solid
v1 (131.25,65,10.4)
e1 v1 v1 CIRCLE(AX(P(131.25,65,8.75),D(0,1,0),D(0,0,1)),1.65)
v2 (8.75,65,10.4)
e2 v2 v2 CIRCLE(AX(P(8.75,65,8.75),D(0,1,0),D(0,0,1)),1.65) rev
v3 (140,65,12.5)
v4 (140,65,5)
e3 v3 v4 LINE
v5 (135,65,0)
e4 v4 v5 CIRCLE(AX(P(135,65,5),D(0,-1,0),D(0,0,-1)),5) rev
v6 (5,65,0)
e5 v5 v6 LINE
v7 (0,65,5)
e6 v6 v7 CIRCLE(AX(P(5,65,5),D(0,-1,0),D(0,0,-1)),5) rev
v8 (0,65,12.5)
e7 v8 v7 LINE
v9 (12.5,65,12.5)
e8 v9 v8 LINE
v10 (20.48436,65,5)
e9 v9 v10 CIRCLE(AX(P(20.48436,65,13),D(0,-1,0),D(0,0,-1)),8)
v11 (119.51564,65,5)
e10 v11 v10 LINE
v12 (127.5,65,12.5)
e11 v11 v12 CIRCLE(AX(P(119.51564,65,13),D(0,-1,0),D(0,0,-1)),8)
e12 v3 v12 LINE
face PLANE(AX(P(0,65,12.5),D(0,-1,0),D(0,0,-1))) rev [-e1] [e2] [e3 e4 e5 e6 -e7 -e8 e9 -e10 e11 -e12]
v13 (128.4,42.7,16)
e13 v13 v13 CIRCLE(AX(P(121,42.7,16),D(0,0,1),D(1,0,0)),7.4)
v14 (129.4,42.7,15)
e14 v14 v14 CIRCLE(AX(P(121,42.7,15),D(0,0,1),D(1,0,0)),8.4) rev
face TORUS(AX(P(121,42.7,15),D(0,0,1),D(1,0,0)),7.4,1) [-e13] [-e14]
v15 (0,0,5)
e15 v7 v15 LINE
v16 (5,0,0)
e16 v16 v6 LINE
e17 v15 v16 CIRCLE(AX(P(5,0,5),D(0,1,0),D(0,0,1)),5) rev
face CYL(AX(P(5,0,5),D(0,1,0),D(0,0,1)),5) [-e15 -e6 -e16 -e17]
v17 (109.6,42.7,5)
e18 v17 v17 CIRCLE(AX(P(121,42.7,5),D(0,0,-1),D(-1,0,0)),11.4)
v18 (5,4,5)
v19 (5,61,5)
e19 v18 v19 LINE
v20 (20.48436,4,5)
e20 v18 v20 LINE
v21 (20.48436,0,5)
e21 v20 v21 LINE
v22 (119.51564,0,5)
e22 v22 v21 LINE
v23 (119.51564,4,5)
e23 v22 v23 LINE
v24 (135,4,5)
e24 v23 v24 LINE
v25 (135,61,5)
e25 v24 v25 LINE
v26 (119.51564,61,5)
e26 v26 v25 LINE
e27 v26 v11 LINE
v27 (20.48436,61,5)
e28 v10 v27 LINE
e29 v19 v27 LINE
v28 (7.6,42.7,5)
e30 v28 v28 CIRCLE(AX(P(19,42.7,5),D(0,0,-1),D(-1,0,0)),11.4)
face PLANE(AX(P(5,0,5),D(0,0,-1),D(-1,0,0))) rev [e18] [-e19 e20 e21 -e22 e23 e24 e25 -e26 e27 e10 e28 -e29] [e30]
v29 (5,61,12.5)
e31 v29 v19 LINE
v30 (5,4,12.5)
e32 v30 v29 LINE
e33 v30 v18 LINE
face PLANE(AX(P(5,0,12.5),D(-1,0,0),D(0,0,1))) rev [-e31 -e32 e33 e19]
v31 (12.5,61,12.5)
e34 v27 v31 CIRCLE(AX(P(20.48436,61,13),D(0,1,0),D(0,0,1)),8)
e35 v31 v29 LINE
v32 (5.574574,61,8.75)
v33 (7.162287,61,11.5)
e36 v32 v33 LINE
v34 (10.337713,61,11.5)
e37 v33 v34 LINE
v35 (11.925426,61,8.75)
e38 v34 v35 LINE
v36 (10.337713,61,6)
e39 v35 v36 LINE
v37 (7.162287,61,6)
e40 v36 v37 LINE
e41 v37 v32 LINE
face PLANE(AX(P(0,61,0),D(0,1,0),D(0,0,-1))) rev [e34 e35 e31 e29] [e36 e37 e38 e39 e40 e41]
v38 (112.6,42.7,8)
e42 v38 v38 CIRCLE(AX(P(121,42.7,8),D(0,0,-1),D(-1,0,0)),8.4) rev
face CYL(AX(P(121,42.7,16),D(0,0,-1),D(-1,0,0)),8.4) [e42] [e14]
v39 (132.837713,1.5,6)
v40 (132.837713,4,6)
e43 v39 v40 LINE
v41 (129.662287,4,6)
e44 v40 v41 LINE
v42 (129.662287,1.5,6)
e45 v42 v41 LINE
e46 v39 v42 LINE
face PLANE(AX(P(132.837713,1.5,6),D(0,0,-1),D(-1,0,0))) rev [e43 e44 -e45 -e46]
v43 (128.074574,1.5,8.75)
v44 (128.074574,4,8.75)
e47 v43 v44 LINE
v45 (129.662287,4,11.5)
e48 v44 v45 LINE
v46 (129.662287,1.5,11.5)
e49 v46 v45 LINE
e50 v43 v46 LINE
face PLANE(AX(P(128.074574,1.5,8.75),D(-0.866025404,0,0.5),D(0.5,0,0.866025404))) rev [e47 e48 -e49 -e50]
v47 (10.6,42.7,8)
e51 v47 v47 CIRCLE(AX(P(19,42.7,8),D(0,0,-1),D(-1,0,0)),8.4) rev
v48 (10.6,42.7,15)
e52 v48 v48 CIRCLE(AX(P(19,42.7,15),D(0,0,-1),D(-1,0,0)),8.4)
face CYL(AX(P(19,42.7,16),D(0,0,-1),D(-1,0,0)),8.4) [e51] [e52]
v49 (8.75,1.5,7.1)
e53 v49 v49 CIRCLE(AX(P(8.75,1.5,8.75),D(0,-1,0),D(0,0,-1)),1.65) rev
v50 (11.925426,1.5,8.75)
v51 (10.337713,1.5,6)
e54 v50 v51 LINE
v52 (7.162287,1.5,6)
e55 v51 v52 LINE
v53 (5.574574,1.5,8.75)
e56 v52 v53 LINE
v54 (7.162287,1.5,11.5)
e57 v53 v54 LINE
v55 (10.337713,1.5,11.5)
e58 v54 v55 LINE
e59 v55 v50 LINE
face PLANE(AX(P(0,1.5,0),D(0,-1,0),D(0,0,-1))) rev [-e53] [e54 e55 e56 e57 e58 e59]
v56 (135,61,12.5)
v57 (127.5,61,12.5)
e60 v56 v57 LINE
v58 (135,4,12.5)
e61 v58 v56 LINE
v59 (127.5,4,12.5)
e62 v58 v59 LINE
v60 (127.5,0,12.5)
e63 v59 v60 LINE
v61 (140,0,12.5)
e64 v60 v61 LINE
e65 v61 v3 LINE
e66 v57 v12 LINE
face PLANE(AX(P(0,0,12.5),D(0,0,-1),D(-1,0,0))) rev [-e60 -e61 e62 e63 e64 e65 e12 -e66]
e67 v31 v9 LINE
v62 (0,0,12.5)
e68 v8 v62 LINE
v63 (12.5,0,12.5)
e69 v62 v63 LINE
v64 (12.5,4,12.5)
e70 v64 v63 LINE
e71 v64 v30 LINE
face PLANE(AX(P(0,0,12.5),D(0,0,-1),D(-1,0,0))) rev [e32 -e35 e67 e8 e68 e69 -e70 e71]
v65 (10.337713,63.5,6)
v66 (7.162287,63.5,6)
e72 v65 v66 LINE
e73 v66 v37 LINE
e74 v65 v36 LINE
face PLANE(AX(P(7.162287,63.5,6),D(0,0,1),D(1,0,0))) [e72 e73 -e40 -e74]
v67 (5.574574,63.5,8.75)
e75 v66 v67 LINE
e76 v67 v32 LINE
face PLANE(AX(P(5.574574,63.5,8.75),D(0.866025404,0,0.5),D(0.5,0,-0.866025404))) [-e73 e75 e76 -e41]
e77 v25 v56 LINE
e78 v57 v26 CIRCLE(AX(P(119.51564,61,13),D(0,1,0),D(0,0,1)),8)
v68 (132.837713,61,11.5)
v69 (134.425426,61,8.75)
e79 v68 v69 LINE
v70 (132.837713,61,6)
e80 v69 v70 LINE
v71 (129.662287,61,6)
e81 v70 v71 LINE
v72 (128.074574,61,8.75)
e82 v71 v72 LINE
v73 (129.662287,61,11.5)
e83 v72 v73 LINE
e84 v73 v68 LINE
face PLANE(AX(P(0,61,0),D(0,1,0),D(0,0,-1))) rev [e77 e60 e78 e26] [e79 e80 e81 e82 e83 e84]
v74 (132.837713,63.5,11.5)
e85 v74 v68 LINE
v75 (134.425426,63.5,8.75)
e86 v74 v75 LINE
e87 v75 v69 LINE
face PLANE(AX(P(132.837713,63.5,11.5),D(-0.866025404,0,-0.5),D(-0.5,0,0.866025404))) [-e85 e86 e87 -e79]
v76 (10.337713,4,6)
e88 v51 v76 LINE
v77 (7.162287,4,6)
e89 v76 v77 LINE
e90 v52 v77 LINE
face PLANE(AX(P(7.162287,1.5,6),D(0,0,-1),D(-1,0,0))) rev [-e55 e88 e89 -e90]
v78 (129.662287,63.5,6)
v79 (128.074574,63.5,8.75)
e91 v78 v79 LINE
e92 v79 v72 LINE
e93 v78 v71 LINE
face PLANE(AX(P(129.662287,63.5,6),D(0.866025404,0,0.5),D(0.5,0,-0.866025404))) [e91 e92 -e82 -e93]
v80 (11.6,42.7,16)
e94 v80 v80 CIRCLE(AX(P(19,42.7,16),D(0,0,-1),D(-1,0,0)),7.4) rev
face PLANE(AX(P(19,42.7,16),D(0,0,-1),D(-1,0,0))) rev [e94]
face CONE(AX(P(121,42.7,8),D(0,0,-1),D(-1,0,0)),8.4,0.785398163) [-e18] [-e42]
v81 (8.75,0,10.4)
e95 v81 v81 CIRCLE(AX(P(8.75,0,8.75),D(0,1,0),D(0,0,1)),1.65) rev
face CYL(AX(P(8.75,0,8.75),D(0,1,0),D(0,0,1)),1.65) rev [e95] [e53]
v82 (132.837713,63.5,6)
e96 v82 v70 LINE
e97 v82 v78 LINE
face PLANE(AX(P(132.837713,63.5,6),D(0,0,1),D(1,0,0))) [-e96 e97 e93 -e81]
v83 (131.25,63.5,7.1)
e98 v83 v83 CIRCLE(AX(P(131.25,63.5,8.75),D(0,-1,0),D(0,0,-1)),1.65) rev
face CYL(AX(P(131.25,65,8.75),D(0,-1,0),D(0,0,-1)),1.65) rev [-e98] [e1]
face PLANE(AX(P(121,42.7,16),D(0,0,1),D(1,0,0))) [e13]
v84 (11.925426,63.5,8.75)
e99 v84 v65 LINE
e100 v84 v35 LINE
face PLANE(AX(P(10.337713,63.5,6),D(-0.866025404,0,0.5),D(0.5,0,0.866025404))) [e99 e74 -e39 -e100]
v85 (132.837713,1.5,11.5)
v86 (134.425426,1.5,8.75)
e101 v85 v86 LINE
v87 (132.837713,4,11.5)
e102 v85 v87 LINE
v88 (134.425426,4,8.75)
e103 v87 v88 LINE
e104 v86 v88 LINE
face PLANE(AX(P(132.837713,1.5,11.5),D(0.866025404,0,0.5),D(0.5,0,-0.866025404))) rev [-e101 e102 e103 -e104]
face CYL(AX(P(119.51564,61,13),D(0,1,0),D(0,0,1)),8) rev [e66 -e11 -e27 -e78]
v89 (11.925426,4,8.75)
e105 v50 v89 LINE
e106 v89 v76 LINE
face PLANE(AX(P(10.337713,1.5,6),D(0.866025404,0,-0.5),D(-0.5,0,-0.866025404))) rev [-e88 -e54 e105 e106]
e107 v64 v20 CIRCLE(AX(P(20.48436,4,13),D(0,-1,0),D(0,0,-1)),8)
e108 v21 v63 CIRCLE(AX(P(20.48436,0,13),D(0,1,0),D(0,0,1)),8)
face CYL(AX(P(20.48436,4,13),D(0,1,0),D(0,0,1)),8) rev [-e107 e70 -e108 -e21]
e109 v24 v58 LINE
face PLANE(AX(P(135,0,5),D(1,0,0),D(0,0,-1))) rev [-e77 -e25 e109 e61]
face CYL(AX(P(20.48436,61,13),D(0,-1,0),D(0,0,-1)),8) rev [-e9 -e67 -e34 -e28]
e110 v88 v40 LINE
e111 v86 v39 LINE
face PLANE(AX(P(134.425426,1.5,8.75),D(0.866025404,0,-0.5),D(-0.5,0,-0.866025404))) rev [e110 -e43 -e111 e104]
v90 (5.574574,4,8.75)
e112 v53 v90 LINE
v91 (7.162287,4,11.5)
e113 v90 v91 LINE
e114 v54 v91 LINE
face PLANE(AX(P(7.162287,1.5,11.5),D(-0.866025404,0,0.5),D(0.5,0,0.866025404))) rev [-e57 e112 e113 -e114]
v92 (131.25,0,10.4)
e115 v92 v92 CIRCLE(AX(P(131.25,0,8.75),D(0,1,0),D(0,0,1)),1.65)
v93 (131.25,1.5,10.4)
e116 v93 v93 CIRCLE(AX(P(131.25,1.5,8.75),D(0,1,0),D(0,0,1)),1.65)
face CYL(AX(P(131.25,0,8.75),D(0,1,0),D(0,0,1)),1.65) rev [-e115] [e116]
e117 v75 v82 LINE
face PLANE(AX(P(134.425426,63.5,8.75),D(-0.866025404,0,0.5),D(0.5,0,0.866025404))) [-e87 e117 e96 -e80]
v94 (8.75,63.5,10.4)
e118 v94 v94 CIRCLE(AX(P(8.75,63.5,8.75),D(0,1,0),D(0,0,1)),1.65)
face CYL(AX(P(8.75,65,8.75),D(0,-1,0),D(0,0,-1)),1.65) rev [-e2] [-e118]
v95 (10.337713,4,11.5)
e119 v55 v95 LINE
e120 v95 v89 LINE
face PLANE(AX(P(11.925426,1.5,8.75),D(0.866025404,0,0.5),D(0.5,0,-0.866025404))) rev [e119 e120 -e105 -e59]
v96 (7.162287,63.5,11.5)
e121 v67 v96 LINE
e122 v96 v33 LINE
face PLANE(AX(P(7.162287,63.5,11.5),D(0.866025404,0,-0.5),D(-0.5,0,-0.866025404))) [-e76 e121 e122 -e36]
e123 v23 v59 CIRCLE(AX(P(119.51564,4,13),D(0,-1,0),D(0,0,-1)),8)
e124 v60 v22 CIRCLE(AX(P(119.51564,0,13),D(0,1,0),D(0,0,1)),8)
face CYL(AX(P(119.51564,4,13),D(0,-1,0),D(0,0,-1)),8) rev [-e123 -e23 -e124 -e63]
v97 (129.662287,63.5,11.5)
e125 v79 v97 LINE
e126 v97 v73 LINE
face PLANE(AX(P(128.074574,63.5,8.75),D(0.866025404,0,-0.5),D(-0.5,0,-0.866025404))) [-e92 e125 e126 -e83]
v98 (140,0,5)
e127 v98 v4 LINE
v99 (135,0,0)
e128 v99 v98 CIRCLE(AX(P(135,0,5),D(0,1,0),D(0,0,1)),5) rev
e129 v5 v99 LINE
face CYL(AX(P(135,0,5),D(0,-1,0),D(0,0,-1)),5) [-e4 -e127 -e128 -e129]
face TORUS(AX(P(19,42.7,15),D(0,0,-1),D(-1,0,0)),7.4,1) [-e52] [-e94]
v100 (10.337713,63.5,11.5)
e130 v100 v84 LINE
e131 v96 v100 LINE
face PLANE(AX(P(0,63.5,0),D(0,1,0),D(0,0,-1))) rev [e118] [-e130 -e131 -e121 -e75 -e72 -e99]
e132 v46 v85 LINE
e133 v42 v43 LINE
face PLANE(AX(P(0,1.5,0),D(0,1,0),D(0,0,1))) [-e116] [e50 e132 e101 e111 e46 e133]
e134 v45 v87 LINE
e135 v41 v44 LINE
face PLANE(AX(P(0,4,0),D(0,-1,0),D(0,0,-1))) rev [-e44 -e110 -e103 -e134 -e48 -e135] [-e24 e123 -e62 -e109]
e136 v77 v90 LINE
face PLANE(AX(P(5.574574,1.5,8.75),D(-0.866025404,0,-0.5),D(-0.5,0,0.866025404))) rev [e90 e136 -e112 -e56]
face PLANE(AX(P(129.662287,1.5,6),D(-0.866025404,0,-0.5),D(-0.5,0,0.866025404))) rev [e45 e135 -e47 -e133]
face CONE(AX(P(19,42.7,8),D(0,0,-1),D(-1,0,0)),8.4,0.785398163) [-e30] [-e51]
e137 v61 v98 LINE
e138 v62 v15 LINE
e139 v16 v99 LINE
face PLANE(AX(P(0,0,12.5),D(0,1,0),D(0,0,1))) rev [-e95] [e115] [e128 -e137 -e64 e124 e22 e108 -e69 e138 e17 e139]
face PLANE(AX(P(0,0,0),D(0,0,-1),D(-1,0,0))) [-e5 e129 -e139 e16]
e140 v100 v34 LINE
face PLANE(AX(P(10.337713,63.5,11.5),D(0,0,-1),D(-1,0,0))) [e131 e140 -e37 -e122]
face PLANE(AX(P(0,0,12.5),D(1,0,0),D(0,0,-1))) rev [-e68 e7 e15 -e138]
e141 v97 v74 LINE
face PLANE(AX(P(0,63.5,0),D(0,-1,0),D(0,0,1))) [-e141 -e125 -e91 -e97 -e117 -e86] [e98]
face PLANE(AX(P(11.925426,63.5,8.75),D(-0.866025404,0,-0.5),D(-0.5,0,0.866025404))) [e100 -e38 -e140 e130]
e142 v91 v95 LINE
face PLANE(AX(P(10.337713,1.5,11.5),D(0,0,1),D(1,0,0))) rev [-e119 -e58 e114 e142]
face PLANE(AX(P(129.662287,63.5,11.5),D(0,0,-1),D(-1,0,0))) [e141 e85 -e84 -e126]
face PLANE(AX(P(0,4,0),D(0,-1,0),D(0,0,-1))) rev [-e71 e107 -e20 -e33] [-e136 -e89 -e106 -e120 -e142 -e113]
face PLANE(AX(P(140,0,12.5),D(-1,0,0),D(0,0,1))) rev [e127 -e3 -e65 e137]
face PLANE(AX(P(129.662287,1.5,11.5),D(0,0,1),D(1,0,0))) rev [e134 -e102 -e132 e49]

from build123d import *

# Parameters (mm, degrees)
SKETCH1_W            = 140
SKETCH1_H            = 65
BOSS_EXTRUDE1_DEPTH  = 12.5
SKETCH3_W            = 130
SKETCH3_H            = 7.5
CUT_EXTRUDE1_DEPTH   = 155.858806659
FILLET1_R            = 5
SKETCH4_W            = 7.5
SKETCH4_H            = 7.5
BOSS_EXTRUDE2_DEPTH  = 4
SKETCH5_R            = 1.65
CUT_EXTRUDE2_DEPTH   = 2.5
SKETCH5_3_R          = 1.65
CUT_EXTRUDE3_DEPTH   = 154.222876882
FILLET2_R            = 8
FILLET2_OF_MIRROR1_R = 8
SKETCH7_R            = 8.4
BOSS_EXTRUDE3_DEPTH  = 11
FILLET3_R            = 1
CHAMFER1_SIZE        = 3


with BuildPart() as part:
    # Sketch1 → Boss-Extrude1 (new body)
    with BuildSketch(Plane.XY):
        with Locations((70, 32.5)):
            Rectangle(SKETCH1_W, SKETCH1_H)
    extrude(amount=BOSS_EXTRUDE1_DEPTH)

    # Sketch3 → Cut-Extrude1 (cut, through all)
    with BuildSketch(Plane(origin=(0, 65, 0), x_dir=(1, 0, 0), z_dir=(0, 1, 0))):
        with Locations((70, -8.75)):
            Rectangle(SKETCH3_W, SKETCH3_H)
    extrude(amount=-CUT_EXTRUDE1_DEPTH, mode=Mode.SUBTRACT)

    # Fillet1
    fillet1_edges = [part.edges().sort_by_distance(p)[0] for p in [
        (140, 32.5, 0),
        (0, 32.5, 0),
    ]]
    fillet(fillet1_edges, radius=FILLET1_R)

    # Sketch4 → Boss-Extrude2 (add)
    with BuildSketch(Plane.XZ):
        with Locations((8.75, 8.75)):
            Rectangle(SKETCH4_W, SKETCH4_H)
        with Locations((131.25, 8.75)):
            Rectangle(SKETCH4_W, SKETCH4_H)
    boss_extrude2 = extrude(amount=-BOSS_EXTRUDE2_DEPTH)

    # Sketch5 → Cut-Extrude2 (cut)
    # profile 1 of 2: a face of its own
    with BuildSketch(Plane(origin=(0, 4, 0), x_dir=(1, 0, 0), z_dir=(0, 1, 0))):
        Polygon((134.425426481, -8.75), (132.83771324, -6), (129.66228676, -6), (128.074573519, -8.75), (129.66228676, -11.5), (132.83771324, -11.5), align=None)
        with Locations(Location((131.25, -8.75, 0), (0, 0, 270))):
            Circle(SKETCH5_R, mode=Mode.SUBTRACT)
    # profile 2 of 2: a face of its own
    with BuildSketch(Plane(origin=(0, 4, 0), x_dir=(1, 0, 0), z_dir=(0, 1, 0))):
        Polygon((10.33771324, -6), (11.925426481, -8.75), (10.33771324, -11.5), (7.16228676, -11.5), (5.574573519, -8.75), (7.16228676, -6), align=None)
        with Locations(Location((8.75, -8.75, 0), (0, 0, 90))):
            Circle(SKETCH5_R, mode=Mode.SUBTRACT)
    cut_extrude2 = extrude(amount=-CUT_EXTRUDE2_DEPTH, mode=Mode.SUBTRACT)

    # Sketch5<3> → Cut-Extrude3 (cut, through all)
    with BuildSketch(Plane(origin=(0, 4, 0), x_dir=(1, 0, 0), z_dir=(0, 1, 0))):
        with Locations(Location((8.75, -8.75, 0), (0, 0, 270))):
            Circle(SKETCH5_3_R)
        with Locations(Location((131.25, -8.75, 0), (0, 0, 270))):
            Circle(SKETCH5_3_R)
    cut_extrude3 = extrude(amount=-CUT_EXTRUDE3_DEPTH, mode=Mode.SUBTRACT)

    # Fillet2
    # the kernel refuses this fillet: 8 mm, written as the material it adds along each edge
    with BuildSketch(Plane(origin=(127.5, 0, 5), x_dir=(-1, 0, 0), z_dir=(0, 1, 0))) as fillet2_piece_1:
        with BuildLine():
            CenterArc((7.984359711, 8), FILLET2_R, 183.583321698, 86.416678302)
            Line((0, 7.5), (-0.159687194, 7.49))
            ThreePointArc((-0.159687194, 7.49), (-0.16, 3.75), (-0.16, 0))
            Line((-0.16, 0), (0, -0.16))
            Line((0, -0.16), (7.984359711, -0.16))
            Line((7.984359711, -0.16), (7.984359711, 0))
        make_face()
    extrude(amount=4)
    with BuildSketch(Plane(origin=(12.5, 0, 5), x_dir=(1, 0, 0), z_dir=(0, 1, 0))) as fillet2_piece_2:
        with BuildLine():
            CenterArc((7.984359711, -8), FILLET2_R, 90, 86.416678302)
            Line((0, -7.5), (-0.159687194, -7.49))
            ThreePointArc((-0.159687194, -7.49), (-0.16, -3.75), (-0.16, 0))
            Line((-0.16, 0), (0, 0.16))
            Line((0, 0.16), (7.984359711, 0.16))
            Line((7.984359711, 0.16), (7.984359711, 0))
        make_face()
    extrude(amount=4)

    # Mirror1: Boss-Extrude2, Cut-Extrude2, Cut-Extrude3 across plane
    add(boss_extrude2.mirror(Plane.ZX.offset(32.5)))
    add(cut_extrude2.mirror(Plane.ZX.offset(32.5)), mode=Mode.SUBTRACT)
    add(cut_extrude3.mirror(Plane.ZX.offset(32.5)), mode=Mode.SUBTRACT)

    # Fillet2 of Mirror1
    # the kernel refuses this fillet: 8 mm, written as the material it adds along each edge
    with BuildSketch(Plane(origin=(127.5, 65, 5), x_dir=(0, 0, 1), z_dir=(0, -1, 0))) as fillet2_of_mirror1_piece_1:
        with BuildLine():
            CenterArc((8, 7.984359711), FILLET2_OF_MIRROR1_R, 180, 86.416678302)
            Line((0, 7.984359711), (-0.16, 7.984359711))
            Line((-0.16, 7.984359711), (-0.16, 0))
            Line((-0.16, 0), (0, -0.16))
            ThreePointArc((0, -0.16), (3.75, -0.16), (7.49, -0.159687194))
            Line((7.49, -0.159687194), (7.5, 0))
        make_face()
    extrude(amount=4)
    with BuildSketch(Plane(origin=(12.5, 65, 5), x_dir=(0, 0, 1), z_dir=(0, -1, 0))) as fillet2_of_mirror1_piece_2:
        with BuildLine():
            CenterArc((8, -7.984359711), FILLET2_OF_MIRROR1_R, 93.583321698, 86.416678302)
            Line((0, -7.984359711), (-0.16, -7.984359711))
            Line((-0.16, -7.984359711), (-0.16, 0))
            Line((-0.16, 0), (0, 0.16))
            ThreePointArc((0, 0.16), (3.75, 0.16), (7.49, 0.159687194))
            Line((7.49, 0.159687194), (7.5, 0))
        make_face()
    extrude(amount=4)

    # Sketch7 → Boss-Extrude3 (add)
    with BuildSketch(Plane.XY.offset(5)):
        with Locations(Location((121, 42.7, 0), (0, 0, 180))):
            Circle(SKETCH7_R)
        with Locations(Location((19, 42.7, 0), (0, 0, 180))):
            Circle(SKETCH7_R)
    extrude(amount=BOSS_EXTRUDE3_DEPTH)

    # Fillet3
    fillet3_edges = [part.edges().sort_by_distance(p)[0] for p in [
        (129.4, 42.7, 16),
        (27.4, 42.7, 16),
    ]]
    fillet(fillet3_edges, radius=FILLET3_R)

    # Chamfer1
    chamfer1_edges = [part.edges().sort_by_distance(p)[0] for p in [
        (129.4, 42.7, 5),
        (27.4, 42.7, 5),
    ]]
    chamfer(chamfer1_edges, length=CHAMFER1_SIZE)


solid = part.part
